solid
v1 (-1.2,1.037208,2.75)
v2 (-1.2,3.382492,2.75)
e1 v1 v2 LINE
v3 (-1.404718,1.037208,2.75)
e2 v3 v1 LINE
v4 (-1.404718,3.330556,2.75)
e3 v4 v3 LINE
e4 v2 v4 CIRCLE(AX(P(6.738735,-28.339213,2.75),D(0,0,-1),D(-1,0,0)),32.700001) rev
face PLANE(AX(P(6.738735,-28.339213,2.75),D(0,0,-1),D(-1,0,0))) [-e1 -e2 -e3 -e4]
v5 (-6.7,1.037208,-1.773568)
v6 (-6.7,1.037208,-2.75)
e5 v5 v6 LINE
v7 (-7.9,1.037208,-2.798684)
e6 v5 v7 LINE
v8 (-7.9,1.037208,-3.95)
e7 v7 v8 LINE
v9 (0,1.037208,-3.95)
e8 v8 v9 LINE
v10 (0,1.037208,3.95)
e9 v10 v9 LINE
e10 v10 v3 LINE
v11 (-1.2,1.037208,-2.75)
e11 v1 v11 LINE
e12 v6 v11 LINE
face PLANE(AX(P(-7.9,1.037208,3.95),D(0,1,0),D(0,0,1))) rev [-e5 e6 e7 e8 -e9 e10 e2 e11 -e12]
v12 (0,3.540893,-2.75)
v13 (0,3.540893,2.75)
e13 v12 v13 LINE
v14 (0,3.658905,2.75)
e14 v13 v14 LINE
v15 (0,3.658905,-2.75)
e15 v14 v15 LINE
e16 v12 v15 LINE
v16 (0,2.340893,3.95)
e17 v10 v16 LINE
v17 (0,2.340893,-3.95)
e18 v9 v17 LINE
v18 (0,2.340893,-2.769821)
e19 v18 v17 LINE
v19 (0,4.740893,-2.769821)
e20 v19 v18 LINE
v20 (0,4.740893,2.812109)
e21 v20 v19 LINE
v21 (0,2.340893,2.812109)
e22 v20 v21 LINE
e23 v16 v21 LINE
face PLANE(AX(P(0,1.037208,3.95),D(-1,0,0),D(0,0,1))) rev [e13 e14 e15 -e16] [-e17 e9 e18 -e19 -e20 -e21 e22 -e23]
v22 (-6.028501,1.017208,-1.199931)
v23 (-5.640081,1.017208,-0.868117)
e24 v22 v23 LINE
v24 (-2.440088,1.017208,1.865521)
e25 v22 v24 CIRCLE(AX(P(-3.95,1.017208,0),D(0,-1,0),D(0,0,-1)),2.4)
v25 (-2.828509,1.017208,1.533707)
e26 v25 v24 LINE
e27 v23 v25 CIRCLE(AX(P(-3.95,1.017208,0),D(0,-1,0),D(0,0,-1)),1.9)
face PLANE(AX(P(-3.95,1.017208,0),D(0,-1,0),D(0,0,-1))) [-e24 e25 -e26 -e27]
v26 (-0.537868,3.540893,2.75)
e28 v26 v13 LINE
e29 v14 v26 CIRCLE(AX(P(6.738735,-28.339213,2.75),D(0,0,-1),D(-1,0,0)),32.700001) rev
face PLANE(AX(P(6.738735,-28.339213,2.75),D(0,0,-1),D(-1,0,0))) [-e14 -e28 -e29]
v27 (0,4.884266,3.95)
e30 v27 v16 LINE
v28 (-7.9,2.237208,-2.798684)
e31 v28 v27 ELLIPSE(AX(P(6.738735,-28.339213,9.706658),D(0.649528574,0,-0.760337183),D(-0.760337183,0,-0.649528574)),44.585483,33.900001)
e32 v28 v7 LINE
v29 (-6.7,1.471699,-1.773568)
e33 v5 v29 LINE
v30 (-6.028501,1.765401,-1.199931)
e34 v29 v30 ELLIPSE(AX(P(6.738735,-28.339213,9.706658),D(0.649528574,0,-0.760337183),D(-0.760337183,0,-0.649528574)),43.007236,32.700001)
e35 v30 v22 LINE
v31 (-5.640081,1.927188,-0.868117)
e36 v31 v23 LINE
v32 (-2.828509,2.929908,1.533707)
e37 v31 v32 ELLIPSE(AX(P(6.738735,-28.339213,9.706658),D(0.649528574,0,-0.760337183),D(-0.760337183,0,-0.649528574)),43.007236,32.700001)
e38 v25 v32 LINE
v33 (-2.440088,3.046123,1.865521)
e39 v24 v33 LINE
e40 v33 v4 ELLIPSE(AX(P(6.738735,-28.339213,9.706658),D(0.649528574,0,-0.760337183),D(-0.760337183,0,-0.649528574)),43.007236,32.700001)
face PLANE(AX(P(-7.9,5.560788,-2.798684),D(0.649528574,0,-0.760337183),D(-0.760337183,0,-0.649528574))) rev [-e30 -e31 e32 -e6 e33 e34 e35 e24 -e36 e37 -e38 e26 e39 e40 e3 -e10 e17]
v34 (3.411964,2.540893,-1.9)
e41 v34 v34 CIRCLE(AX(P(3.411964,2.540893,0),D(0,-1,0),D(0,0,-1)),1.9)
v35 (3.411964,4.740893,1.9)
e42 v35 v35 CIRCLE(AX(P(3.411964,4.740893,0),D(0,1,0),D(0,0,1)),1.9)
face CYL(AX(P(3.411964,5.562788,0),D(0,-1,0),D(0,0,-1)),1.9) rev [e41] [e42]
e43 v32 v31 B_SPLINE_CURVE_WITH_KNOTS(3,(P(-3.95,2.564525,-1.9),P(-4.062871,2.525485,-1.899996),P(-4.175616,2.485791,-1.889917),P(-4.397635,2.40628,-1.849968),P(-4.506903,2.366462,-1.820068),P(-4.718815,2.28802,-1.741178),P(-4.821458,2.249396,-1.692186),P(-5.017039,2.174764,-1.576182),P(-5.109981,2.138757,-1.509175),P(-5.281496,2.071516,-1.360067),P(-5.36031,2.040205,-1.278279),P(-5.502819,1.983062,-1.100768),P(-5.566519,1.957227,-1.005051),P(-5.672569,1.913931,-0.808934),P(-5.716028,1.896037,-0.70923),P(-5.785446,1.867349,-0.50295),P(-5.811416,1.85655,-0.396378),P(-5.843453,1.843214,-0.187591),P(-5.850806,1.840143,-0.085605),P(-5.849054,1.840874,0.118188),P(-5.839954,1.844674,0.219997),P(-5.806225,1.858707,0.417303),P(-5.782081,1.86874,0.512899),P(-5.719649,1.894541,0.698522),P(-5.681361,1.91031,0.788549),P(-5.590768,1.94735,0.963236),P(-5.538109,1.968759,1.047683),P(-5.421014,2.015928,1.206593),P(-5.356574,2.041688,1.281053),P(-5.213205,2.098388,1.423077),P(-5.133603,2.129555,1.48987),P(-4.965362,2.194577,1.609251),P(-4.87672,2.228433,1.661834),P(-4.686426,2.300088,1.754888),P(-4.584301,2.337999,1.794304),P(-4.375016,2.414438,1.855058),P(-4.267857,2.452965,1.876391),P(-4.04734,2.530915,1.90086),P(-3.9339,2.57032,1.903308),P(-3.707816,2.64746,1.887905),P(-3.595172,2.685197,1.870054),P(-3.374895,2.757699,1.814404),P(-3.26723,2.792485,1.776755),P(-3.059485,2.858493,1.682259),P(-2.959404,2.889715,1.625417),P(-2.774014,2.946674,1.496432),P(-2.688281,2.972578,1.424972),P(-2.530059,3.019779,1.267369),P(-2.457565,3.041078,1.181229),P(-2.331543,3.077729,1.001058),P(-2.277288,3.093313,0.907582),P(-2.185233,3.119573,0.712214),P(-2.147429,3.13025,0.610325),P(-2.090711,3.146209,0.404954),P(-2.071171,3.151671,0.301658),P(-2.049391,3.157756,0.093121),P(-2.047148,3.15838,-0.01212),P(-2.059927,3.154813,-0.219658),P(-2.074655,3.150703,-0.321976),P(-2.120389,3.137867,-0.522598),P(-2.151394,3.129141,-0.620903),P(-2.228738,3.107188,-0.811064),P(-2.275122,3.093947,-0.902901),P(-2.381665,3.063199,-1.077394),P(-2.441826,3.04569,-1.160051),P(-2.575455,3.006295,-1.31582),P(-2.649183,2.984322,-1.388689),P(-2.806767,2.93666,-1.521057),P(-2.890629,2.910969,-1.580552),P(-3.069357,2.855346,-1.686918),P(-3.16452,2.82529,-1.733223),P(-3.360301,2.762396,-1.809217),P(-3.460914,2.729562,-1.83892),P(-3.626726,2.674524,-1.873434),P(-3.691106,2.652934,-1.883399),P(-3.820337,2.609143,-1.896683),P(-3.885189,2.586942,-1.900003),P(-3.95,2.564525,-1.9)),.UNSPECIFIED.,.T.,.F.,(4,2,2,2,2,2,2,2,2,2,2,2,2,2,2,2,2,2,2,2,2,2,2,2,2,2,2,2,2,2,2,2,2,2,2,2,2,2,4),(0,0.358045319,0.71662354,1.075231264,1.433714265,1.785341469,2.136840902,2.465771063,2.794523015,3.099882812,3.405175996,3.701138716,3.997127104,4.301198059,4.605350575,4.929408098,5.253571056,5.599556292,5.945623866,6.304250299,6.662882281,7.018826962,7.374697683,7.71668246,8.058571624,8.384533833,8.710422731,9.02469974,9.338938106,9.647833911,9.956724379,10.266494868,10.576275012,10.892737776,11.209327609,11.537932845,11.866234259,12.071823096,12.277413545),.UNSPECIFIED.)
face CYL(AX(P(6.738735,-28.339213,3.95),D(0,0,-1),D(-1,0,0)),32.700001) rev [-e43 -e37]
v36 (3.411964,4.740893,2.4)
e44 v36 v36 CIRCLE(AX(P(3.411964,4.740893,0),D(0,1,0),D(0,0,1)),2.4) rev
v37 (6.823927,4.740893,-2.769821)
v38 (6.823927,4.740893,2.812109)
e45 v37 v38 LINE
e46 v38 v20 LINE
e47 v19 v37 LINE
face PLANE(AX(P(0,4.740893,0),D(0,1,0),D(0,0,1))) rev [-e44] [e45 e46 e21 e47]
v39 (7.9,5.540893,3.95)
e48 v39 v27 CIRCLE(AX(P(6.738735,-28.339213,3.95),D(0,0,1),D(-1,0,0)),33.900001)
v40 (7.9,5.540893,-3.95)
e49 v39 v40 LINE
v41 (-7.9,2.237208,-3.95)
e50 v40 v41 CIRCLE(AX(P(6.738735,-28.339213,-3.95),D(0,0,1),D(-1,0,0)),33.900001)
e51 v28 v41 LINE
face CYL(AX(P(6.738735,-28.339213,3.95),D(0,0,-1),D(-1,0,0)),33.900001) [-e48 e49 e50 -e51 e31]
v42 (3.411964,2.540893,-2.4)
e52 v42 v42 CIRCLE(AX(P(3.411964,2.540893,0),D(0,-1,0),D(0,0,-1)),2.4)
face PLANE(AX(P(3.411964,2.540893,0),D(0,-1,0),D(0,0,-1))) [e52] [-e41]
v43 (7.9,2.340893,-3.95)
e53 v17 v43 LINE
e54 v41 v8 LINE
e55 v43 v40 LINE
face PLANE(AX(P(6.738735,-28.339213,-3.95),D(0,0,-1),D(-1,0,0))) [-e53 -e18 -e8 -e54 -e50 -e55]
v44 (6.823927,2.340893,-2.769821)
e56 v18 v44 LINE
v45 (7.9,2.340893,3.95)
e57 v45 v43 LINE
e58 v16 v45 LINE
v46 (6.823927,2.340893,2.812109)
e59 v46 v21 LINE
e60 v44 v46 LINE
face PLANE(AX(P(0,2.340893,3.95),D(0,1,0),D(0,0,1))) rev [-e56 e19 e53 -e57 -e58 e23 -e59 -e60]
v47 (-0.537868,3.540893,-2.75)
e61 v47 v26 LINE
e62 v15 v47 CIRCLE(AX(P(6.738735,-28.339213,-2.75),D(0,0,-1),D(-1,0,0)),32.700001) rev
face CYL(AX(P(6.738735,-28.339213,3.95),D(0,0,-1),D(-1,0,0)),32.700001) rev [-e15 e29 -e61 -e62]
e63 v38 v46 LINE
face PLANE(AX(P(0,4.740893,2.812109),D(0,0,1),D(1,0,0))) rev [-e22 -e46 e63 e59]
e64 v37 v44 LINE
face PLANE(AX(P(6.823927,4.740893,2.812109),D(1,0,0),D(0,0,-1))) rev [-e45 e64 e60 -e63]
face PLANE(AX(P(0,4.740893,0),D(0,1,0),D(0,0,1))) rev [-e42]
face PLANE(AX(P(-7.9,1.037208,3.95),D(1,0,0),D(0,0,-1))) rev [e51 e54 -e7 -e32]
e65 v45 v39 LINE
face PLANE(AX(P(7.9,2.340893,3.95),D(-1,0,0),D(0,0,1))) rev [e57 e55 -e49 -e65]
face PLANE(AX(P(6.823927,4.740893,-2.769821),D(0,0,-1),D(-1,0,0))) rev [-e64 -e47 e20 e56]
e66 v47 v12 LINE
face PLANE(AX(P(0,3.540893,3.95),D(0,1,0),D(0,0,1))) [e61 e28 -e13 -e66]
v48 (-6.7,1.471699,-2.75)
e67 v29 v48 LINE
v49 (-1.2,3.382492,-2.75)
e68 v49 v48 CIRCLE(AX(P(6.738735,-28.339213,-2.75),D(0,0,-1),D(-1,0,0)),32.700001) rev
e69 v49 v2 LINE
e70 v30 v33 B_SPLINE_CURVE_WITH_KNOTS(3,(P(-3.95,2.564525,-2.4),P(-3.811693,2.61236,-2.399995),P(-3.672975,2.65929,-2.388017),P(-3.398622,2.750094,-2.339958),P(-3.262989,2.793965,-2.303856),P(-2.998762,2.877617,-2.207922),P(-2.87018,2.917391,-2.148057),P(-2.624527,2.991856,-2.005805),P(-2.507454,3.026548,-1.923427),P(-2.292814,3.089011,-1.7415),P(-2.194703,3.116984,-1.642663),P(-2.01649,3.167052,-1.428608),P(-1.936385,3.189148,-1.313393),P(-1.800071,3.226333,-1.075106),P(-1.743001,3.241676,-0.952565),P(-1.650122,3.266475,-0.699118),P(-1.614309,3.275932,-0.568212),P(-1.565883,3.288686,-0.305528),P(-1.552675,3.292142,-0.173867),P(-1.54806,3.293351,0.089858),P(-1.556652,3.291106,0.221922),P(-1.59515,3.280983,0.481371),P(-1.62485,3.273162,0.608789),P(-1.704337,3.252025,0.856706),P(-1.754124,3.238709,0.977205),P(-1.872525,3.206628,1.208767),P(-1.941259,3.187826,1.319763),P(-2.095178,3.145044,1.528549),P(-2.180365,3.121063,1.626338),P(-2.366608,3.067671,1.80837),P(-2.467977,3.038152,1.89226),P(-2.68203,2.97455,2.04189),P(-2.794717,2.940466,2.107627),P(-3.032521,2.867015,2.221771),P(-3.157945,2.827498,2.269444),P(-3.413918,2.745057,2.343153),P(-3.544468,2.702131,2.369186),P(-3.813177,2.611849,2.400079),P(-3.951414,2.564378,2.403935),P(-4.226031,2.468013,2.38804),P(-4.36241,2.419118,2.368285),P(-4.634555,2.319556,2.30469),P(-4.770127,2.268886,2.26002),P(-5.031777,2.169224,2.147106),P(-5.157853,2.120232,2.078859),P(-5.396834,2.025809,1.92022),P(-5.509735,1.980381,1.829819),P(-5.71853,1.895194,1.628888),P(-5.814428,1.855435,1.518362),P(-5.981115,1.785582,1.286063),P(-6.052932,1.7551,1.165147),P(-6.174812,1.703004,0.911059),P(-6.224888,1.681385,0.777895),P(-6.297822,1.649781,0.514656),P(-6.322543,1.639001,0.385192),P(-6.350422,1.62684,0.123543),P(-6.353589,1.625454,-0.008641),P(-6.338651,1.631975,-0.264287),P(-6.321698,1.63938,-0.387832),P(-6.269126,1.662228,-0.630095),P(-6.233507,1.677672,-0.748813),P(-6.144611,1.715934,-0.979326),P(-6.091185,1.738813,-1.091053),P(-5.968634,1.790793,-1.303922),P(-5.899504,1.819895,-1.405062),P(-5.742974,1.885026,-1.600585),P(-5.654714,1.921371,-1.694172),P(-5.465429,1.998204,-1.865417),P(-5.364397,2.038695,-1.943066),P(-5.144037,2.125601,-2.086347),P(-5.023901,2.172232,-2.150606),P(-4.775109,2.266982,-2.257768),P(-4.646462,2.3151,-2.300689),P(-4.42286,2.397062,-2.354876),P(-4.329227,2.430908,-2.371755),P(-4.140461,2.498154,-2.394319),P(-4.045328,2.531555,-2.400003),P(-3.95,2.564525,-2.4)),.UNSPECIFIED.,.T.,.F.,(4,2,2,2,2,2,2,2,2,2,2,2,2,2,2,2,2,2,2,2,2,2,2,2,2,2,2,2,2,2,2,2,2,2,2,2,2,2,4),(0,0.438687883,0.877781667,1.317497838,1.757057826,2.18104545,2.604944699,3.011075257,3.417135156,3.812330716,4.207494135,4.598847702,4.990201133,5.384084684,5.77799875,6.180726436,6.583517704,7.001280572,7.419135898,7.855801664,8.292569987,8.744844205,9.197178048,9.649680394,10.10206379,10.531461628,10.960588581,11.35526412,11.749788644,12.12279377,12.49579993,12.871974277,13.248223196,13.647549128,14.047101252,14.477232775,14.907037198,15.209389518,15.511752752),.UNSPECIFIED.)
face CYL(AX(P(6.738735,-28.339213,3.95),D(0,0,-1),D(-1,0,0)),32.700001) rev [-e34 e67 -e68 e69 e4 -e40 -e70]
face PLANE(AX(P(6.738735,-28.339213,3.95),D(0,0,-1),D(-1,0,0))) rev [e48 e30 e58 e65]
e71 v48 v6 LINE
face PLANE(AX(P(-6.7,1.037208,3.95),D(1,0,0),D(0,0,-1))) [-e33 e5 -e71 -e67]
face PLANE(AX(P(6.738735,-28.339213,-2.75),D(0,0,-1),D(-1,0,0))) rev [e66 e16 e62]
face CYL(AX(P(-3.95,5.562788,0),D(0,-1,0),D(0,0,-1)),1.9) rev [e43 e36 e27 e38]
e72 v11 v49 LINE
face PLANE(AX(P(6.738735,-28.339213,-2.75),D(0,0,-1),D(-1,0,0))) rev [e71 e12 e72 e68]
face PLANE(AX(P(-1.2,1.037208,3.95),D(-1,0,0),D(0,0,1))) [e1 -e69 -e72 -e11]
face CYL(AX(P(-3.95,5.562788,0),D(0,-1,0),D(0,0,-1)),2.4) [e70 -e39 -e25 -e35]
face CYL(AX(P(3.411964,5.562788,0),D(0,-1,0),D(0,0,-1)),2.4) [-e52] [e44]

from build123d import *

# Parameters (mm, degrees)
BOSS_EXTRUDE1_DEPTH      = 3.95
SHELL1_START             = -2.75
SHELL1_DEPTH             = 5.5
BOSS_EXTRUDE2_REACH      = 11.943
BOSS_EXTRUDE2_END_RADIUS = 32.700000868
BOSS_EXTRUDE2_START      = 0.02
SKETCH2_R                = 2.4
SKETCH2_R_2              = 1.9
SKETCH3_W                = 6.823927471
SKETCH3_H                = 5.581929969
CUT_EXTRUDE1_DEPTH       = 2.4
BOSS_EXTRUDE3_REACH      = 11.601
BOSS_EXTRUDE3_START      = -0.2
SKETCH4_R                = 2.4
SKETCH4_R_2              = 1.9
CUT_EXTRUDE6_DEPTH       = 10.923471076
CUT_EXTRUDE6_DEPTH_BACK  = 10.923471076


# Read off the part's stored shape, not the designer's step: Shell1
with BuildPart() as part:
    # Sketch1 → Boss-Extrude1 (new, symmetric)
    with BuildSketch(Plane.XY):
        with BuildLine():
            Line((-7.9, 1.037208095), (0, 1.037208095))
            Line((0, 1.037208095), (0, 2.340892579))
            Line((0, 2.340892579), (7.9, 2.340892579))
            Line((7.9, 2.340892579), (7.9, 5.540892579))
            ThreePointArc((7.9, 5.540892579), (-0.199501968, 4.843176285), (-7.9, 2.237208095))
            Line((-7.9, 2.237208095), (-7.9, 1.037208095))
        make_face()
    extrude(amount=BOSS_EXTRUDE1_DEPTH, both=True)

    # Shell1 outline → Shell1 (cut)
    with BuildSketch(Plane.XY.offset(SHELL1_START)):
        with BuildLine():
            Line((-1.2, 1.037208095), (-1.2, 3.382492095))
            ThreePointArc((-1.2, 3.382492095), (-3.992613389, 2.549753458), (-6.7, 1.471699231))
            Line((-6.7, 1.471699231), (-6.7, 1.037208095))
            Line((-6.7, 1.037208095), (-1.2, 1.037208095))
        make_face()
        with BuildLine():
            ThreePointArc((6.7, 4.360765395), (3.058165542, 4.152993699), (-0.537868318, 3.540892579))
            Line((-0.537868318, 3.540892579), (6.7, 3.540892579))
            Line((6.7, 3.540892579), (6.7, 4.360765395))
        make_face()
    extrude(amount=SHELL1_DEPTH, mode=Mode.SUBTRACT)

    # Boss-Extrude2: up to this cylinder (the profile starts inside it)
    boss_extrude2_end = Plane(origin=(6.738734935, -28.339212532, 2.332118), z_dir=(0, 0, -1)) * Cylinder(BOSS_EXTRUDE2_END_RADIUS, 90.286001737, mode=Mode.PRIVATE)
    # Sketch2 → Boss-Extrude2 (add, up to the surface)
    with BuildSketch(Plane(origin=(0, 1.037208095, 0), x_dir=(-1, 0, 0), z_dir=(0, -1, 0)).offset(BOSS_EXTRUDE2_START), mode=Mode.PRIVATE) as boss_extrude2_sk1:
        with Locations(Location((3.95, 0, 0), (0, 0, 90))):
            Circle(SKETCH2_R)
        with Locations(Location((3.95, 0, 0), (0, 0, 90))):
            Circle(SKETCH2_R_2, mode=Mode.SUBTRACT)
    boss_extrude2_tool1 = extrude(boss_extrude2_sk1.sketch, amount=-BOSS_EXTRUDE2_REACH, mode=Mode.PRIVATE) & boss_extrude2_end
    add(boss_extrude2_tool1.solids().sort_by_distance((-3.95, 1.017208, 2.332118))[0])

    # Sketch3 → Cut-Extrude1 (cut)
    with BuildSketch(Plane.XZ.offset(-2.340892579)):
        with Locations((3.411963736, 0.021143674)):
            Rectangle(SKETCH3_W, SKETCH3_H)
    extrude(amount=-CUT_EXTRUDE1_DEPTH, mode=Mode.SUBTRACT)

    # Sketch4 → Boss-Extrude3 (add, up to next)
    with BuildSketch(Plane(origin=(0, 2.340892579, 0), x_dir=(-1, 0, 0), z_dir=(0, -1, 0)).offset(BOSS_EXTRUDE3_START), mode=Mode.PRIVATE) as boss_extrude3_sk1:
        with Locations(Location((-3.411963735, 0, 0), (0, 0, 90))):
            Circle(SKETCH4_R)
        with Locations(Location((-3.411963735, 0, 0), (0, 0, 90))):
            Circle(SKETCH4_R_2, mode=Mode.SUBTRACT)
    boss_extrude3_tool1 = extrude(boss_extrude3_sk1.sketch, amount=-BOSS_EXTRUDE3_REACH, mode=Mode.PRIVATE) - part.part
    add(boss_extrude3_tool1.solids().sort_by_distance((3.411964, 2.540893, 2.332118))[0])

    # Sketch10 → Cut-Extrude6 (cut, two sides: drawn at the far end of the back side and taken through both)
    with BuildSketch(Plane(origin=(0, 1.037208095, 0), x_dir=(-1, 0, 0), z_dir=(0, -1, 0)).offset(-CUT_EXTRUDE6_DEPTH_BACK)):
        Polygon((7.9, 2.798684465), (0, -3.95), (7.9, -3.95), align=None)
    extrude(amount=CUT_EXTRUDE6_DEPTH + CUT_EXTRUDE6_DEPTH_BACK, mode=Mode.SUBTRACT)


solid = part.part
